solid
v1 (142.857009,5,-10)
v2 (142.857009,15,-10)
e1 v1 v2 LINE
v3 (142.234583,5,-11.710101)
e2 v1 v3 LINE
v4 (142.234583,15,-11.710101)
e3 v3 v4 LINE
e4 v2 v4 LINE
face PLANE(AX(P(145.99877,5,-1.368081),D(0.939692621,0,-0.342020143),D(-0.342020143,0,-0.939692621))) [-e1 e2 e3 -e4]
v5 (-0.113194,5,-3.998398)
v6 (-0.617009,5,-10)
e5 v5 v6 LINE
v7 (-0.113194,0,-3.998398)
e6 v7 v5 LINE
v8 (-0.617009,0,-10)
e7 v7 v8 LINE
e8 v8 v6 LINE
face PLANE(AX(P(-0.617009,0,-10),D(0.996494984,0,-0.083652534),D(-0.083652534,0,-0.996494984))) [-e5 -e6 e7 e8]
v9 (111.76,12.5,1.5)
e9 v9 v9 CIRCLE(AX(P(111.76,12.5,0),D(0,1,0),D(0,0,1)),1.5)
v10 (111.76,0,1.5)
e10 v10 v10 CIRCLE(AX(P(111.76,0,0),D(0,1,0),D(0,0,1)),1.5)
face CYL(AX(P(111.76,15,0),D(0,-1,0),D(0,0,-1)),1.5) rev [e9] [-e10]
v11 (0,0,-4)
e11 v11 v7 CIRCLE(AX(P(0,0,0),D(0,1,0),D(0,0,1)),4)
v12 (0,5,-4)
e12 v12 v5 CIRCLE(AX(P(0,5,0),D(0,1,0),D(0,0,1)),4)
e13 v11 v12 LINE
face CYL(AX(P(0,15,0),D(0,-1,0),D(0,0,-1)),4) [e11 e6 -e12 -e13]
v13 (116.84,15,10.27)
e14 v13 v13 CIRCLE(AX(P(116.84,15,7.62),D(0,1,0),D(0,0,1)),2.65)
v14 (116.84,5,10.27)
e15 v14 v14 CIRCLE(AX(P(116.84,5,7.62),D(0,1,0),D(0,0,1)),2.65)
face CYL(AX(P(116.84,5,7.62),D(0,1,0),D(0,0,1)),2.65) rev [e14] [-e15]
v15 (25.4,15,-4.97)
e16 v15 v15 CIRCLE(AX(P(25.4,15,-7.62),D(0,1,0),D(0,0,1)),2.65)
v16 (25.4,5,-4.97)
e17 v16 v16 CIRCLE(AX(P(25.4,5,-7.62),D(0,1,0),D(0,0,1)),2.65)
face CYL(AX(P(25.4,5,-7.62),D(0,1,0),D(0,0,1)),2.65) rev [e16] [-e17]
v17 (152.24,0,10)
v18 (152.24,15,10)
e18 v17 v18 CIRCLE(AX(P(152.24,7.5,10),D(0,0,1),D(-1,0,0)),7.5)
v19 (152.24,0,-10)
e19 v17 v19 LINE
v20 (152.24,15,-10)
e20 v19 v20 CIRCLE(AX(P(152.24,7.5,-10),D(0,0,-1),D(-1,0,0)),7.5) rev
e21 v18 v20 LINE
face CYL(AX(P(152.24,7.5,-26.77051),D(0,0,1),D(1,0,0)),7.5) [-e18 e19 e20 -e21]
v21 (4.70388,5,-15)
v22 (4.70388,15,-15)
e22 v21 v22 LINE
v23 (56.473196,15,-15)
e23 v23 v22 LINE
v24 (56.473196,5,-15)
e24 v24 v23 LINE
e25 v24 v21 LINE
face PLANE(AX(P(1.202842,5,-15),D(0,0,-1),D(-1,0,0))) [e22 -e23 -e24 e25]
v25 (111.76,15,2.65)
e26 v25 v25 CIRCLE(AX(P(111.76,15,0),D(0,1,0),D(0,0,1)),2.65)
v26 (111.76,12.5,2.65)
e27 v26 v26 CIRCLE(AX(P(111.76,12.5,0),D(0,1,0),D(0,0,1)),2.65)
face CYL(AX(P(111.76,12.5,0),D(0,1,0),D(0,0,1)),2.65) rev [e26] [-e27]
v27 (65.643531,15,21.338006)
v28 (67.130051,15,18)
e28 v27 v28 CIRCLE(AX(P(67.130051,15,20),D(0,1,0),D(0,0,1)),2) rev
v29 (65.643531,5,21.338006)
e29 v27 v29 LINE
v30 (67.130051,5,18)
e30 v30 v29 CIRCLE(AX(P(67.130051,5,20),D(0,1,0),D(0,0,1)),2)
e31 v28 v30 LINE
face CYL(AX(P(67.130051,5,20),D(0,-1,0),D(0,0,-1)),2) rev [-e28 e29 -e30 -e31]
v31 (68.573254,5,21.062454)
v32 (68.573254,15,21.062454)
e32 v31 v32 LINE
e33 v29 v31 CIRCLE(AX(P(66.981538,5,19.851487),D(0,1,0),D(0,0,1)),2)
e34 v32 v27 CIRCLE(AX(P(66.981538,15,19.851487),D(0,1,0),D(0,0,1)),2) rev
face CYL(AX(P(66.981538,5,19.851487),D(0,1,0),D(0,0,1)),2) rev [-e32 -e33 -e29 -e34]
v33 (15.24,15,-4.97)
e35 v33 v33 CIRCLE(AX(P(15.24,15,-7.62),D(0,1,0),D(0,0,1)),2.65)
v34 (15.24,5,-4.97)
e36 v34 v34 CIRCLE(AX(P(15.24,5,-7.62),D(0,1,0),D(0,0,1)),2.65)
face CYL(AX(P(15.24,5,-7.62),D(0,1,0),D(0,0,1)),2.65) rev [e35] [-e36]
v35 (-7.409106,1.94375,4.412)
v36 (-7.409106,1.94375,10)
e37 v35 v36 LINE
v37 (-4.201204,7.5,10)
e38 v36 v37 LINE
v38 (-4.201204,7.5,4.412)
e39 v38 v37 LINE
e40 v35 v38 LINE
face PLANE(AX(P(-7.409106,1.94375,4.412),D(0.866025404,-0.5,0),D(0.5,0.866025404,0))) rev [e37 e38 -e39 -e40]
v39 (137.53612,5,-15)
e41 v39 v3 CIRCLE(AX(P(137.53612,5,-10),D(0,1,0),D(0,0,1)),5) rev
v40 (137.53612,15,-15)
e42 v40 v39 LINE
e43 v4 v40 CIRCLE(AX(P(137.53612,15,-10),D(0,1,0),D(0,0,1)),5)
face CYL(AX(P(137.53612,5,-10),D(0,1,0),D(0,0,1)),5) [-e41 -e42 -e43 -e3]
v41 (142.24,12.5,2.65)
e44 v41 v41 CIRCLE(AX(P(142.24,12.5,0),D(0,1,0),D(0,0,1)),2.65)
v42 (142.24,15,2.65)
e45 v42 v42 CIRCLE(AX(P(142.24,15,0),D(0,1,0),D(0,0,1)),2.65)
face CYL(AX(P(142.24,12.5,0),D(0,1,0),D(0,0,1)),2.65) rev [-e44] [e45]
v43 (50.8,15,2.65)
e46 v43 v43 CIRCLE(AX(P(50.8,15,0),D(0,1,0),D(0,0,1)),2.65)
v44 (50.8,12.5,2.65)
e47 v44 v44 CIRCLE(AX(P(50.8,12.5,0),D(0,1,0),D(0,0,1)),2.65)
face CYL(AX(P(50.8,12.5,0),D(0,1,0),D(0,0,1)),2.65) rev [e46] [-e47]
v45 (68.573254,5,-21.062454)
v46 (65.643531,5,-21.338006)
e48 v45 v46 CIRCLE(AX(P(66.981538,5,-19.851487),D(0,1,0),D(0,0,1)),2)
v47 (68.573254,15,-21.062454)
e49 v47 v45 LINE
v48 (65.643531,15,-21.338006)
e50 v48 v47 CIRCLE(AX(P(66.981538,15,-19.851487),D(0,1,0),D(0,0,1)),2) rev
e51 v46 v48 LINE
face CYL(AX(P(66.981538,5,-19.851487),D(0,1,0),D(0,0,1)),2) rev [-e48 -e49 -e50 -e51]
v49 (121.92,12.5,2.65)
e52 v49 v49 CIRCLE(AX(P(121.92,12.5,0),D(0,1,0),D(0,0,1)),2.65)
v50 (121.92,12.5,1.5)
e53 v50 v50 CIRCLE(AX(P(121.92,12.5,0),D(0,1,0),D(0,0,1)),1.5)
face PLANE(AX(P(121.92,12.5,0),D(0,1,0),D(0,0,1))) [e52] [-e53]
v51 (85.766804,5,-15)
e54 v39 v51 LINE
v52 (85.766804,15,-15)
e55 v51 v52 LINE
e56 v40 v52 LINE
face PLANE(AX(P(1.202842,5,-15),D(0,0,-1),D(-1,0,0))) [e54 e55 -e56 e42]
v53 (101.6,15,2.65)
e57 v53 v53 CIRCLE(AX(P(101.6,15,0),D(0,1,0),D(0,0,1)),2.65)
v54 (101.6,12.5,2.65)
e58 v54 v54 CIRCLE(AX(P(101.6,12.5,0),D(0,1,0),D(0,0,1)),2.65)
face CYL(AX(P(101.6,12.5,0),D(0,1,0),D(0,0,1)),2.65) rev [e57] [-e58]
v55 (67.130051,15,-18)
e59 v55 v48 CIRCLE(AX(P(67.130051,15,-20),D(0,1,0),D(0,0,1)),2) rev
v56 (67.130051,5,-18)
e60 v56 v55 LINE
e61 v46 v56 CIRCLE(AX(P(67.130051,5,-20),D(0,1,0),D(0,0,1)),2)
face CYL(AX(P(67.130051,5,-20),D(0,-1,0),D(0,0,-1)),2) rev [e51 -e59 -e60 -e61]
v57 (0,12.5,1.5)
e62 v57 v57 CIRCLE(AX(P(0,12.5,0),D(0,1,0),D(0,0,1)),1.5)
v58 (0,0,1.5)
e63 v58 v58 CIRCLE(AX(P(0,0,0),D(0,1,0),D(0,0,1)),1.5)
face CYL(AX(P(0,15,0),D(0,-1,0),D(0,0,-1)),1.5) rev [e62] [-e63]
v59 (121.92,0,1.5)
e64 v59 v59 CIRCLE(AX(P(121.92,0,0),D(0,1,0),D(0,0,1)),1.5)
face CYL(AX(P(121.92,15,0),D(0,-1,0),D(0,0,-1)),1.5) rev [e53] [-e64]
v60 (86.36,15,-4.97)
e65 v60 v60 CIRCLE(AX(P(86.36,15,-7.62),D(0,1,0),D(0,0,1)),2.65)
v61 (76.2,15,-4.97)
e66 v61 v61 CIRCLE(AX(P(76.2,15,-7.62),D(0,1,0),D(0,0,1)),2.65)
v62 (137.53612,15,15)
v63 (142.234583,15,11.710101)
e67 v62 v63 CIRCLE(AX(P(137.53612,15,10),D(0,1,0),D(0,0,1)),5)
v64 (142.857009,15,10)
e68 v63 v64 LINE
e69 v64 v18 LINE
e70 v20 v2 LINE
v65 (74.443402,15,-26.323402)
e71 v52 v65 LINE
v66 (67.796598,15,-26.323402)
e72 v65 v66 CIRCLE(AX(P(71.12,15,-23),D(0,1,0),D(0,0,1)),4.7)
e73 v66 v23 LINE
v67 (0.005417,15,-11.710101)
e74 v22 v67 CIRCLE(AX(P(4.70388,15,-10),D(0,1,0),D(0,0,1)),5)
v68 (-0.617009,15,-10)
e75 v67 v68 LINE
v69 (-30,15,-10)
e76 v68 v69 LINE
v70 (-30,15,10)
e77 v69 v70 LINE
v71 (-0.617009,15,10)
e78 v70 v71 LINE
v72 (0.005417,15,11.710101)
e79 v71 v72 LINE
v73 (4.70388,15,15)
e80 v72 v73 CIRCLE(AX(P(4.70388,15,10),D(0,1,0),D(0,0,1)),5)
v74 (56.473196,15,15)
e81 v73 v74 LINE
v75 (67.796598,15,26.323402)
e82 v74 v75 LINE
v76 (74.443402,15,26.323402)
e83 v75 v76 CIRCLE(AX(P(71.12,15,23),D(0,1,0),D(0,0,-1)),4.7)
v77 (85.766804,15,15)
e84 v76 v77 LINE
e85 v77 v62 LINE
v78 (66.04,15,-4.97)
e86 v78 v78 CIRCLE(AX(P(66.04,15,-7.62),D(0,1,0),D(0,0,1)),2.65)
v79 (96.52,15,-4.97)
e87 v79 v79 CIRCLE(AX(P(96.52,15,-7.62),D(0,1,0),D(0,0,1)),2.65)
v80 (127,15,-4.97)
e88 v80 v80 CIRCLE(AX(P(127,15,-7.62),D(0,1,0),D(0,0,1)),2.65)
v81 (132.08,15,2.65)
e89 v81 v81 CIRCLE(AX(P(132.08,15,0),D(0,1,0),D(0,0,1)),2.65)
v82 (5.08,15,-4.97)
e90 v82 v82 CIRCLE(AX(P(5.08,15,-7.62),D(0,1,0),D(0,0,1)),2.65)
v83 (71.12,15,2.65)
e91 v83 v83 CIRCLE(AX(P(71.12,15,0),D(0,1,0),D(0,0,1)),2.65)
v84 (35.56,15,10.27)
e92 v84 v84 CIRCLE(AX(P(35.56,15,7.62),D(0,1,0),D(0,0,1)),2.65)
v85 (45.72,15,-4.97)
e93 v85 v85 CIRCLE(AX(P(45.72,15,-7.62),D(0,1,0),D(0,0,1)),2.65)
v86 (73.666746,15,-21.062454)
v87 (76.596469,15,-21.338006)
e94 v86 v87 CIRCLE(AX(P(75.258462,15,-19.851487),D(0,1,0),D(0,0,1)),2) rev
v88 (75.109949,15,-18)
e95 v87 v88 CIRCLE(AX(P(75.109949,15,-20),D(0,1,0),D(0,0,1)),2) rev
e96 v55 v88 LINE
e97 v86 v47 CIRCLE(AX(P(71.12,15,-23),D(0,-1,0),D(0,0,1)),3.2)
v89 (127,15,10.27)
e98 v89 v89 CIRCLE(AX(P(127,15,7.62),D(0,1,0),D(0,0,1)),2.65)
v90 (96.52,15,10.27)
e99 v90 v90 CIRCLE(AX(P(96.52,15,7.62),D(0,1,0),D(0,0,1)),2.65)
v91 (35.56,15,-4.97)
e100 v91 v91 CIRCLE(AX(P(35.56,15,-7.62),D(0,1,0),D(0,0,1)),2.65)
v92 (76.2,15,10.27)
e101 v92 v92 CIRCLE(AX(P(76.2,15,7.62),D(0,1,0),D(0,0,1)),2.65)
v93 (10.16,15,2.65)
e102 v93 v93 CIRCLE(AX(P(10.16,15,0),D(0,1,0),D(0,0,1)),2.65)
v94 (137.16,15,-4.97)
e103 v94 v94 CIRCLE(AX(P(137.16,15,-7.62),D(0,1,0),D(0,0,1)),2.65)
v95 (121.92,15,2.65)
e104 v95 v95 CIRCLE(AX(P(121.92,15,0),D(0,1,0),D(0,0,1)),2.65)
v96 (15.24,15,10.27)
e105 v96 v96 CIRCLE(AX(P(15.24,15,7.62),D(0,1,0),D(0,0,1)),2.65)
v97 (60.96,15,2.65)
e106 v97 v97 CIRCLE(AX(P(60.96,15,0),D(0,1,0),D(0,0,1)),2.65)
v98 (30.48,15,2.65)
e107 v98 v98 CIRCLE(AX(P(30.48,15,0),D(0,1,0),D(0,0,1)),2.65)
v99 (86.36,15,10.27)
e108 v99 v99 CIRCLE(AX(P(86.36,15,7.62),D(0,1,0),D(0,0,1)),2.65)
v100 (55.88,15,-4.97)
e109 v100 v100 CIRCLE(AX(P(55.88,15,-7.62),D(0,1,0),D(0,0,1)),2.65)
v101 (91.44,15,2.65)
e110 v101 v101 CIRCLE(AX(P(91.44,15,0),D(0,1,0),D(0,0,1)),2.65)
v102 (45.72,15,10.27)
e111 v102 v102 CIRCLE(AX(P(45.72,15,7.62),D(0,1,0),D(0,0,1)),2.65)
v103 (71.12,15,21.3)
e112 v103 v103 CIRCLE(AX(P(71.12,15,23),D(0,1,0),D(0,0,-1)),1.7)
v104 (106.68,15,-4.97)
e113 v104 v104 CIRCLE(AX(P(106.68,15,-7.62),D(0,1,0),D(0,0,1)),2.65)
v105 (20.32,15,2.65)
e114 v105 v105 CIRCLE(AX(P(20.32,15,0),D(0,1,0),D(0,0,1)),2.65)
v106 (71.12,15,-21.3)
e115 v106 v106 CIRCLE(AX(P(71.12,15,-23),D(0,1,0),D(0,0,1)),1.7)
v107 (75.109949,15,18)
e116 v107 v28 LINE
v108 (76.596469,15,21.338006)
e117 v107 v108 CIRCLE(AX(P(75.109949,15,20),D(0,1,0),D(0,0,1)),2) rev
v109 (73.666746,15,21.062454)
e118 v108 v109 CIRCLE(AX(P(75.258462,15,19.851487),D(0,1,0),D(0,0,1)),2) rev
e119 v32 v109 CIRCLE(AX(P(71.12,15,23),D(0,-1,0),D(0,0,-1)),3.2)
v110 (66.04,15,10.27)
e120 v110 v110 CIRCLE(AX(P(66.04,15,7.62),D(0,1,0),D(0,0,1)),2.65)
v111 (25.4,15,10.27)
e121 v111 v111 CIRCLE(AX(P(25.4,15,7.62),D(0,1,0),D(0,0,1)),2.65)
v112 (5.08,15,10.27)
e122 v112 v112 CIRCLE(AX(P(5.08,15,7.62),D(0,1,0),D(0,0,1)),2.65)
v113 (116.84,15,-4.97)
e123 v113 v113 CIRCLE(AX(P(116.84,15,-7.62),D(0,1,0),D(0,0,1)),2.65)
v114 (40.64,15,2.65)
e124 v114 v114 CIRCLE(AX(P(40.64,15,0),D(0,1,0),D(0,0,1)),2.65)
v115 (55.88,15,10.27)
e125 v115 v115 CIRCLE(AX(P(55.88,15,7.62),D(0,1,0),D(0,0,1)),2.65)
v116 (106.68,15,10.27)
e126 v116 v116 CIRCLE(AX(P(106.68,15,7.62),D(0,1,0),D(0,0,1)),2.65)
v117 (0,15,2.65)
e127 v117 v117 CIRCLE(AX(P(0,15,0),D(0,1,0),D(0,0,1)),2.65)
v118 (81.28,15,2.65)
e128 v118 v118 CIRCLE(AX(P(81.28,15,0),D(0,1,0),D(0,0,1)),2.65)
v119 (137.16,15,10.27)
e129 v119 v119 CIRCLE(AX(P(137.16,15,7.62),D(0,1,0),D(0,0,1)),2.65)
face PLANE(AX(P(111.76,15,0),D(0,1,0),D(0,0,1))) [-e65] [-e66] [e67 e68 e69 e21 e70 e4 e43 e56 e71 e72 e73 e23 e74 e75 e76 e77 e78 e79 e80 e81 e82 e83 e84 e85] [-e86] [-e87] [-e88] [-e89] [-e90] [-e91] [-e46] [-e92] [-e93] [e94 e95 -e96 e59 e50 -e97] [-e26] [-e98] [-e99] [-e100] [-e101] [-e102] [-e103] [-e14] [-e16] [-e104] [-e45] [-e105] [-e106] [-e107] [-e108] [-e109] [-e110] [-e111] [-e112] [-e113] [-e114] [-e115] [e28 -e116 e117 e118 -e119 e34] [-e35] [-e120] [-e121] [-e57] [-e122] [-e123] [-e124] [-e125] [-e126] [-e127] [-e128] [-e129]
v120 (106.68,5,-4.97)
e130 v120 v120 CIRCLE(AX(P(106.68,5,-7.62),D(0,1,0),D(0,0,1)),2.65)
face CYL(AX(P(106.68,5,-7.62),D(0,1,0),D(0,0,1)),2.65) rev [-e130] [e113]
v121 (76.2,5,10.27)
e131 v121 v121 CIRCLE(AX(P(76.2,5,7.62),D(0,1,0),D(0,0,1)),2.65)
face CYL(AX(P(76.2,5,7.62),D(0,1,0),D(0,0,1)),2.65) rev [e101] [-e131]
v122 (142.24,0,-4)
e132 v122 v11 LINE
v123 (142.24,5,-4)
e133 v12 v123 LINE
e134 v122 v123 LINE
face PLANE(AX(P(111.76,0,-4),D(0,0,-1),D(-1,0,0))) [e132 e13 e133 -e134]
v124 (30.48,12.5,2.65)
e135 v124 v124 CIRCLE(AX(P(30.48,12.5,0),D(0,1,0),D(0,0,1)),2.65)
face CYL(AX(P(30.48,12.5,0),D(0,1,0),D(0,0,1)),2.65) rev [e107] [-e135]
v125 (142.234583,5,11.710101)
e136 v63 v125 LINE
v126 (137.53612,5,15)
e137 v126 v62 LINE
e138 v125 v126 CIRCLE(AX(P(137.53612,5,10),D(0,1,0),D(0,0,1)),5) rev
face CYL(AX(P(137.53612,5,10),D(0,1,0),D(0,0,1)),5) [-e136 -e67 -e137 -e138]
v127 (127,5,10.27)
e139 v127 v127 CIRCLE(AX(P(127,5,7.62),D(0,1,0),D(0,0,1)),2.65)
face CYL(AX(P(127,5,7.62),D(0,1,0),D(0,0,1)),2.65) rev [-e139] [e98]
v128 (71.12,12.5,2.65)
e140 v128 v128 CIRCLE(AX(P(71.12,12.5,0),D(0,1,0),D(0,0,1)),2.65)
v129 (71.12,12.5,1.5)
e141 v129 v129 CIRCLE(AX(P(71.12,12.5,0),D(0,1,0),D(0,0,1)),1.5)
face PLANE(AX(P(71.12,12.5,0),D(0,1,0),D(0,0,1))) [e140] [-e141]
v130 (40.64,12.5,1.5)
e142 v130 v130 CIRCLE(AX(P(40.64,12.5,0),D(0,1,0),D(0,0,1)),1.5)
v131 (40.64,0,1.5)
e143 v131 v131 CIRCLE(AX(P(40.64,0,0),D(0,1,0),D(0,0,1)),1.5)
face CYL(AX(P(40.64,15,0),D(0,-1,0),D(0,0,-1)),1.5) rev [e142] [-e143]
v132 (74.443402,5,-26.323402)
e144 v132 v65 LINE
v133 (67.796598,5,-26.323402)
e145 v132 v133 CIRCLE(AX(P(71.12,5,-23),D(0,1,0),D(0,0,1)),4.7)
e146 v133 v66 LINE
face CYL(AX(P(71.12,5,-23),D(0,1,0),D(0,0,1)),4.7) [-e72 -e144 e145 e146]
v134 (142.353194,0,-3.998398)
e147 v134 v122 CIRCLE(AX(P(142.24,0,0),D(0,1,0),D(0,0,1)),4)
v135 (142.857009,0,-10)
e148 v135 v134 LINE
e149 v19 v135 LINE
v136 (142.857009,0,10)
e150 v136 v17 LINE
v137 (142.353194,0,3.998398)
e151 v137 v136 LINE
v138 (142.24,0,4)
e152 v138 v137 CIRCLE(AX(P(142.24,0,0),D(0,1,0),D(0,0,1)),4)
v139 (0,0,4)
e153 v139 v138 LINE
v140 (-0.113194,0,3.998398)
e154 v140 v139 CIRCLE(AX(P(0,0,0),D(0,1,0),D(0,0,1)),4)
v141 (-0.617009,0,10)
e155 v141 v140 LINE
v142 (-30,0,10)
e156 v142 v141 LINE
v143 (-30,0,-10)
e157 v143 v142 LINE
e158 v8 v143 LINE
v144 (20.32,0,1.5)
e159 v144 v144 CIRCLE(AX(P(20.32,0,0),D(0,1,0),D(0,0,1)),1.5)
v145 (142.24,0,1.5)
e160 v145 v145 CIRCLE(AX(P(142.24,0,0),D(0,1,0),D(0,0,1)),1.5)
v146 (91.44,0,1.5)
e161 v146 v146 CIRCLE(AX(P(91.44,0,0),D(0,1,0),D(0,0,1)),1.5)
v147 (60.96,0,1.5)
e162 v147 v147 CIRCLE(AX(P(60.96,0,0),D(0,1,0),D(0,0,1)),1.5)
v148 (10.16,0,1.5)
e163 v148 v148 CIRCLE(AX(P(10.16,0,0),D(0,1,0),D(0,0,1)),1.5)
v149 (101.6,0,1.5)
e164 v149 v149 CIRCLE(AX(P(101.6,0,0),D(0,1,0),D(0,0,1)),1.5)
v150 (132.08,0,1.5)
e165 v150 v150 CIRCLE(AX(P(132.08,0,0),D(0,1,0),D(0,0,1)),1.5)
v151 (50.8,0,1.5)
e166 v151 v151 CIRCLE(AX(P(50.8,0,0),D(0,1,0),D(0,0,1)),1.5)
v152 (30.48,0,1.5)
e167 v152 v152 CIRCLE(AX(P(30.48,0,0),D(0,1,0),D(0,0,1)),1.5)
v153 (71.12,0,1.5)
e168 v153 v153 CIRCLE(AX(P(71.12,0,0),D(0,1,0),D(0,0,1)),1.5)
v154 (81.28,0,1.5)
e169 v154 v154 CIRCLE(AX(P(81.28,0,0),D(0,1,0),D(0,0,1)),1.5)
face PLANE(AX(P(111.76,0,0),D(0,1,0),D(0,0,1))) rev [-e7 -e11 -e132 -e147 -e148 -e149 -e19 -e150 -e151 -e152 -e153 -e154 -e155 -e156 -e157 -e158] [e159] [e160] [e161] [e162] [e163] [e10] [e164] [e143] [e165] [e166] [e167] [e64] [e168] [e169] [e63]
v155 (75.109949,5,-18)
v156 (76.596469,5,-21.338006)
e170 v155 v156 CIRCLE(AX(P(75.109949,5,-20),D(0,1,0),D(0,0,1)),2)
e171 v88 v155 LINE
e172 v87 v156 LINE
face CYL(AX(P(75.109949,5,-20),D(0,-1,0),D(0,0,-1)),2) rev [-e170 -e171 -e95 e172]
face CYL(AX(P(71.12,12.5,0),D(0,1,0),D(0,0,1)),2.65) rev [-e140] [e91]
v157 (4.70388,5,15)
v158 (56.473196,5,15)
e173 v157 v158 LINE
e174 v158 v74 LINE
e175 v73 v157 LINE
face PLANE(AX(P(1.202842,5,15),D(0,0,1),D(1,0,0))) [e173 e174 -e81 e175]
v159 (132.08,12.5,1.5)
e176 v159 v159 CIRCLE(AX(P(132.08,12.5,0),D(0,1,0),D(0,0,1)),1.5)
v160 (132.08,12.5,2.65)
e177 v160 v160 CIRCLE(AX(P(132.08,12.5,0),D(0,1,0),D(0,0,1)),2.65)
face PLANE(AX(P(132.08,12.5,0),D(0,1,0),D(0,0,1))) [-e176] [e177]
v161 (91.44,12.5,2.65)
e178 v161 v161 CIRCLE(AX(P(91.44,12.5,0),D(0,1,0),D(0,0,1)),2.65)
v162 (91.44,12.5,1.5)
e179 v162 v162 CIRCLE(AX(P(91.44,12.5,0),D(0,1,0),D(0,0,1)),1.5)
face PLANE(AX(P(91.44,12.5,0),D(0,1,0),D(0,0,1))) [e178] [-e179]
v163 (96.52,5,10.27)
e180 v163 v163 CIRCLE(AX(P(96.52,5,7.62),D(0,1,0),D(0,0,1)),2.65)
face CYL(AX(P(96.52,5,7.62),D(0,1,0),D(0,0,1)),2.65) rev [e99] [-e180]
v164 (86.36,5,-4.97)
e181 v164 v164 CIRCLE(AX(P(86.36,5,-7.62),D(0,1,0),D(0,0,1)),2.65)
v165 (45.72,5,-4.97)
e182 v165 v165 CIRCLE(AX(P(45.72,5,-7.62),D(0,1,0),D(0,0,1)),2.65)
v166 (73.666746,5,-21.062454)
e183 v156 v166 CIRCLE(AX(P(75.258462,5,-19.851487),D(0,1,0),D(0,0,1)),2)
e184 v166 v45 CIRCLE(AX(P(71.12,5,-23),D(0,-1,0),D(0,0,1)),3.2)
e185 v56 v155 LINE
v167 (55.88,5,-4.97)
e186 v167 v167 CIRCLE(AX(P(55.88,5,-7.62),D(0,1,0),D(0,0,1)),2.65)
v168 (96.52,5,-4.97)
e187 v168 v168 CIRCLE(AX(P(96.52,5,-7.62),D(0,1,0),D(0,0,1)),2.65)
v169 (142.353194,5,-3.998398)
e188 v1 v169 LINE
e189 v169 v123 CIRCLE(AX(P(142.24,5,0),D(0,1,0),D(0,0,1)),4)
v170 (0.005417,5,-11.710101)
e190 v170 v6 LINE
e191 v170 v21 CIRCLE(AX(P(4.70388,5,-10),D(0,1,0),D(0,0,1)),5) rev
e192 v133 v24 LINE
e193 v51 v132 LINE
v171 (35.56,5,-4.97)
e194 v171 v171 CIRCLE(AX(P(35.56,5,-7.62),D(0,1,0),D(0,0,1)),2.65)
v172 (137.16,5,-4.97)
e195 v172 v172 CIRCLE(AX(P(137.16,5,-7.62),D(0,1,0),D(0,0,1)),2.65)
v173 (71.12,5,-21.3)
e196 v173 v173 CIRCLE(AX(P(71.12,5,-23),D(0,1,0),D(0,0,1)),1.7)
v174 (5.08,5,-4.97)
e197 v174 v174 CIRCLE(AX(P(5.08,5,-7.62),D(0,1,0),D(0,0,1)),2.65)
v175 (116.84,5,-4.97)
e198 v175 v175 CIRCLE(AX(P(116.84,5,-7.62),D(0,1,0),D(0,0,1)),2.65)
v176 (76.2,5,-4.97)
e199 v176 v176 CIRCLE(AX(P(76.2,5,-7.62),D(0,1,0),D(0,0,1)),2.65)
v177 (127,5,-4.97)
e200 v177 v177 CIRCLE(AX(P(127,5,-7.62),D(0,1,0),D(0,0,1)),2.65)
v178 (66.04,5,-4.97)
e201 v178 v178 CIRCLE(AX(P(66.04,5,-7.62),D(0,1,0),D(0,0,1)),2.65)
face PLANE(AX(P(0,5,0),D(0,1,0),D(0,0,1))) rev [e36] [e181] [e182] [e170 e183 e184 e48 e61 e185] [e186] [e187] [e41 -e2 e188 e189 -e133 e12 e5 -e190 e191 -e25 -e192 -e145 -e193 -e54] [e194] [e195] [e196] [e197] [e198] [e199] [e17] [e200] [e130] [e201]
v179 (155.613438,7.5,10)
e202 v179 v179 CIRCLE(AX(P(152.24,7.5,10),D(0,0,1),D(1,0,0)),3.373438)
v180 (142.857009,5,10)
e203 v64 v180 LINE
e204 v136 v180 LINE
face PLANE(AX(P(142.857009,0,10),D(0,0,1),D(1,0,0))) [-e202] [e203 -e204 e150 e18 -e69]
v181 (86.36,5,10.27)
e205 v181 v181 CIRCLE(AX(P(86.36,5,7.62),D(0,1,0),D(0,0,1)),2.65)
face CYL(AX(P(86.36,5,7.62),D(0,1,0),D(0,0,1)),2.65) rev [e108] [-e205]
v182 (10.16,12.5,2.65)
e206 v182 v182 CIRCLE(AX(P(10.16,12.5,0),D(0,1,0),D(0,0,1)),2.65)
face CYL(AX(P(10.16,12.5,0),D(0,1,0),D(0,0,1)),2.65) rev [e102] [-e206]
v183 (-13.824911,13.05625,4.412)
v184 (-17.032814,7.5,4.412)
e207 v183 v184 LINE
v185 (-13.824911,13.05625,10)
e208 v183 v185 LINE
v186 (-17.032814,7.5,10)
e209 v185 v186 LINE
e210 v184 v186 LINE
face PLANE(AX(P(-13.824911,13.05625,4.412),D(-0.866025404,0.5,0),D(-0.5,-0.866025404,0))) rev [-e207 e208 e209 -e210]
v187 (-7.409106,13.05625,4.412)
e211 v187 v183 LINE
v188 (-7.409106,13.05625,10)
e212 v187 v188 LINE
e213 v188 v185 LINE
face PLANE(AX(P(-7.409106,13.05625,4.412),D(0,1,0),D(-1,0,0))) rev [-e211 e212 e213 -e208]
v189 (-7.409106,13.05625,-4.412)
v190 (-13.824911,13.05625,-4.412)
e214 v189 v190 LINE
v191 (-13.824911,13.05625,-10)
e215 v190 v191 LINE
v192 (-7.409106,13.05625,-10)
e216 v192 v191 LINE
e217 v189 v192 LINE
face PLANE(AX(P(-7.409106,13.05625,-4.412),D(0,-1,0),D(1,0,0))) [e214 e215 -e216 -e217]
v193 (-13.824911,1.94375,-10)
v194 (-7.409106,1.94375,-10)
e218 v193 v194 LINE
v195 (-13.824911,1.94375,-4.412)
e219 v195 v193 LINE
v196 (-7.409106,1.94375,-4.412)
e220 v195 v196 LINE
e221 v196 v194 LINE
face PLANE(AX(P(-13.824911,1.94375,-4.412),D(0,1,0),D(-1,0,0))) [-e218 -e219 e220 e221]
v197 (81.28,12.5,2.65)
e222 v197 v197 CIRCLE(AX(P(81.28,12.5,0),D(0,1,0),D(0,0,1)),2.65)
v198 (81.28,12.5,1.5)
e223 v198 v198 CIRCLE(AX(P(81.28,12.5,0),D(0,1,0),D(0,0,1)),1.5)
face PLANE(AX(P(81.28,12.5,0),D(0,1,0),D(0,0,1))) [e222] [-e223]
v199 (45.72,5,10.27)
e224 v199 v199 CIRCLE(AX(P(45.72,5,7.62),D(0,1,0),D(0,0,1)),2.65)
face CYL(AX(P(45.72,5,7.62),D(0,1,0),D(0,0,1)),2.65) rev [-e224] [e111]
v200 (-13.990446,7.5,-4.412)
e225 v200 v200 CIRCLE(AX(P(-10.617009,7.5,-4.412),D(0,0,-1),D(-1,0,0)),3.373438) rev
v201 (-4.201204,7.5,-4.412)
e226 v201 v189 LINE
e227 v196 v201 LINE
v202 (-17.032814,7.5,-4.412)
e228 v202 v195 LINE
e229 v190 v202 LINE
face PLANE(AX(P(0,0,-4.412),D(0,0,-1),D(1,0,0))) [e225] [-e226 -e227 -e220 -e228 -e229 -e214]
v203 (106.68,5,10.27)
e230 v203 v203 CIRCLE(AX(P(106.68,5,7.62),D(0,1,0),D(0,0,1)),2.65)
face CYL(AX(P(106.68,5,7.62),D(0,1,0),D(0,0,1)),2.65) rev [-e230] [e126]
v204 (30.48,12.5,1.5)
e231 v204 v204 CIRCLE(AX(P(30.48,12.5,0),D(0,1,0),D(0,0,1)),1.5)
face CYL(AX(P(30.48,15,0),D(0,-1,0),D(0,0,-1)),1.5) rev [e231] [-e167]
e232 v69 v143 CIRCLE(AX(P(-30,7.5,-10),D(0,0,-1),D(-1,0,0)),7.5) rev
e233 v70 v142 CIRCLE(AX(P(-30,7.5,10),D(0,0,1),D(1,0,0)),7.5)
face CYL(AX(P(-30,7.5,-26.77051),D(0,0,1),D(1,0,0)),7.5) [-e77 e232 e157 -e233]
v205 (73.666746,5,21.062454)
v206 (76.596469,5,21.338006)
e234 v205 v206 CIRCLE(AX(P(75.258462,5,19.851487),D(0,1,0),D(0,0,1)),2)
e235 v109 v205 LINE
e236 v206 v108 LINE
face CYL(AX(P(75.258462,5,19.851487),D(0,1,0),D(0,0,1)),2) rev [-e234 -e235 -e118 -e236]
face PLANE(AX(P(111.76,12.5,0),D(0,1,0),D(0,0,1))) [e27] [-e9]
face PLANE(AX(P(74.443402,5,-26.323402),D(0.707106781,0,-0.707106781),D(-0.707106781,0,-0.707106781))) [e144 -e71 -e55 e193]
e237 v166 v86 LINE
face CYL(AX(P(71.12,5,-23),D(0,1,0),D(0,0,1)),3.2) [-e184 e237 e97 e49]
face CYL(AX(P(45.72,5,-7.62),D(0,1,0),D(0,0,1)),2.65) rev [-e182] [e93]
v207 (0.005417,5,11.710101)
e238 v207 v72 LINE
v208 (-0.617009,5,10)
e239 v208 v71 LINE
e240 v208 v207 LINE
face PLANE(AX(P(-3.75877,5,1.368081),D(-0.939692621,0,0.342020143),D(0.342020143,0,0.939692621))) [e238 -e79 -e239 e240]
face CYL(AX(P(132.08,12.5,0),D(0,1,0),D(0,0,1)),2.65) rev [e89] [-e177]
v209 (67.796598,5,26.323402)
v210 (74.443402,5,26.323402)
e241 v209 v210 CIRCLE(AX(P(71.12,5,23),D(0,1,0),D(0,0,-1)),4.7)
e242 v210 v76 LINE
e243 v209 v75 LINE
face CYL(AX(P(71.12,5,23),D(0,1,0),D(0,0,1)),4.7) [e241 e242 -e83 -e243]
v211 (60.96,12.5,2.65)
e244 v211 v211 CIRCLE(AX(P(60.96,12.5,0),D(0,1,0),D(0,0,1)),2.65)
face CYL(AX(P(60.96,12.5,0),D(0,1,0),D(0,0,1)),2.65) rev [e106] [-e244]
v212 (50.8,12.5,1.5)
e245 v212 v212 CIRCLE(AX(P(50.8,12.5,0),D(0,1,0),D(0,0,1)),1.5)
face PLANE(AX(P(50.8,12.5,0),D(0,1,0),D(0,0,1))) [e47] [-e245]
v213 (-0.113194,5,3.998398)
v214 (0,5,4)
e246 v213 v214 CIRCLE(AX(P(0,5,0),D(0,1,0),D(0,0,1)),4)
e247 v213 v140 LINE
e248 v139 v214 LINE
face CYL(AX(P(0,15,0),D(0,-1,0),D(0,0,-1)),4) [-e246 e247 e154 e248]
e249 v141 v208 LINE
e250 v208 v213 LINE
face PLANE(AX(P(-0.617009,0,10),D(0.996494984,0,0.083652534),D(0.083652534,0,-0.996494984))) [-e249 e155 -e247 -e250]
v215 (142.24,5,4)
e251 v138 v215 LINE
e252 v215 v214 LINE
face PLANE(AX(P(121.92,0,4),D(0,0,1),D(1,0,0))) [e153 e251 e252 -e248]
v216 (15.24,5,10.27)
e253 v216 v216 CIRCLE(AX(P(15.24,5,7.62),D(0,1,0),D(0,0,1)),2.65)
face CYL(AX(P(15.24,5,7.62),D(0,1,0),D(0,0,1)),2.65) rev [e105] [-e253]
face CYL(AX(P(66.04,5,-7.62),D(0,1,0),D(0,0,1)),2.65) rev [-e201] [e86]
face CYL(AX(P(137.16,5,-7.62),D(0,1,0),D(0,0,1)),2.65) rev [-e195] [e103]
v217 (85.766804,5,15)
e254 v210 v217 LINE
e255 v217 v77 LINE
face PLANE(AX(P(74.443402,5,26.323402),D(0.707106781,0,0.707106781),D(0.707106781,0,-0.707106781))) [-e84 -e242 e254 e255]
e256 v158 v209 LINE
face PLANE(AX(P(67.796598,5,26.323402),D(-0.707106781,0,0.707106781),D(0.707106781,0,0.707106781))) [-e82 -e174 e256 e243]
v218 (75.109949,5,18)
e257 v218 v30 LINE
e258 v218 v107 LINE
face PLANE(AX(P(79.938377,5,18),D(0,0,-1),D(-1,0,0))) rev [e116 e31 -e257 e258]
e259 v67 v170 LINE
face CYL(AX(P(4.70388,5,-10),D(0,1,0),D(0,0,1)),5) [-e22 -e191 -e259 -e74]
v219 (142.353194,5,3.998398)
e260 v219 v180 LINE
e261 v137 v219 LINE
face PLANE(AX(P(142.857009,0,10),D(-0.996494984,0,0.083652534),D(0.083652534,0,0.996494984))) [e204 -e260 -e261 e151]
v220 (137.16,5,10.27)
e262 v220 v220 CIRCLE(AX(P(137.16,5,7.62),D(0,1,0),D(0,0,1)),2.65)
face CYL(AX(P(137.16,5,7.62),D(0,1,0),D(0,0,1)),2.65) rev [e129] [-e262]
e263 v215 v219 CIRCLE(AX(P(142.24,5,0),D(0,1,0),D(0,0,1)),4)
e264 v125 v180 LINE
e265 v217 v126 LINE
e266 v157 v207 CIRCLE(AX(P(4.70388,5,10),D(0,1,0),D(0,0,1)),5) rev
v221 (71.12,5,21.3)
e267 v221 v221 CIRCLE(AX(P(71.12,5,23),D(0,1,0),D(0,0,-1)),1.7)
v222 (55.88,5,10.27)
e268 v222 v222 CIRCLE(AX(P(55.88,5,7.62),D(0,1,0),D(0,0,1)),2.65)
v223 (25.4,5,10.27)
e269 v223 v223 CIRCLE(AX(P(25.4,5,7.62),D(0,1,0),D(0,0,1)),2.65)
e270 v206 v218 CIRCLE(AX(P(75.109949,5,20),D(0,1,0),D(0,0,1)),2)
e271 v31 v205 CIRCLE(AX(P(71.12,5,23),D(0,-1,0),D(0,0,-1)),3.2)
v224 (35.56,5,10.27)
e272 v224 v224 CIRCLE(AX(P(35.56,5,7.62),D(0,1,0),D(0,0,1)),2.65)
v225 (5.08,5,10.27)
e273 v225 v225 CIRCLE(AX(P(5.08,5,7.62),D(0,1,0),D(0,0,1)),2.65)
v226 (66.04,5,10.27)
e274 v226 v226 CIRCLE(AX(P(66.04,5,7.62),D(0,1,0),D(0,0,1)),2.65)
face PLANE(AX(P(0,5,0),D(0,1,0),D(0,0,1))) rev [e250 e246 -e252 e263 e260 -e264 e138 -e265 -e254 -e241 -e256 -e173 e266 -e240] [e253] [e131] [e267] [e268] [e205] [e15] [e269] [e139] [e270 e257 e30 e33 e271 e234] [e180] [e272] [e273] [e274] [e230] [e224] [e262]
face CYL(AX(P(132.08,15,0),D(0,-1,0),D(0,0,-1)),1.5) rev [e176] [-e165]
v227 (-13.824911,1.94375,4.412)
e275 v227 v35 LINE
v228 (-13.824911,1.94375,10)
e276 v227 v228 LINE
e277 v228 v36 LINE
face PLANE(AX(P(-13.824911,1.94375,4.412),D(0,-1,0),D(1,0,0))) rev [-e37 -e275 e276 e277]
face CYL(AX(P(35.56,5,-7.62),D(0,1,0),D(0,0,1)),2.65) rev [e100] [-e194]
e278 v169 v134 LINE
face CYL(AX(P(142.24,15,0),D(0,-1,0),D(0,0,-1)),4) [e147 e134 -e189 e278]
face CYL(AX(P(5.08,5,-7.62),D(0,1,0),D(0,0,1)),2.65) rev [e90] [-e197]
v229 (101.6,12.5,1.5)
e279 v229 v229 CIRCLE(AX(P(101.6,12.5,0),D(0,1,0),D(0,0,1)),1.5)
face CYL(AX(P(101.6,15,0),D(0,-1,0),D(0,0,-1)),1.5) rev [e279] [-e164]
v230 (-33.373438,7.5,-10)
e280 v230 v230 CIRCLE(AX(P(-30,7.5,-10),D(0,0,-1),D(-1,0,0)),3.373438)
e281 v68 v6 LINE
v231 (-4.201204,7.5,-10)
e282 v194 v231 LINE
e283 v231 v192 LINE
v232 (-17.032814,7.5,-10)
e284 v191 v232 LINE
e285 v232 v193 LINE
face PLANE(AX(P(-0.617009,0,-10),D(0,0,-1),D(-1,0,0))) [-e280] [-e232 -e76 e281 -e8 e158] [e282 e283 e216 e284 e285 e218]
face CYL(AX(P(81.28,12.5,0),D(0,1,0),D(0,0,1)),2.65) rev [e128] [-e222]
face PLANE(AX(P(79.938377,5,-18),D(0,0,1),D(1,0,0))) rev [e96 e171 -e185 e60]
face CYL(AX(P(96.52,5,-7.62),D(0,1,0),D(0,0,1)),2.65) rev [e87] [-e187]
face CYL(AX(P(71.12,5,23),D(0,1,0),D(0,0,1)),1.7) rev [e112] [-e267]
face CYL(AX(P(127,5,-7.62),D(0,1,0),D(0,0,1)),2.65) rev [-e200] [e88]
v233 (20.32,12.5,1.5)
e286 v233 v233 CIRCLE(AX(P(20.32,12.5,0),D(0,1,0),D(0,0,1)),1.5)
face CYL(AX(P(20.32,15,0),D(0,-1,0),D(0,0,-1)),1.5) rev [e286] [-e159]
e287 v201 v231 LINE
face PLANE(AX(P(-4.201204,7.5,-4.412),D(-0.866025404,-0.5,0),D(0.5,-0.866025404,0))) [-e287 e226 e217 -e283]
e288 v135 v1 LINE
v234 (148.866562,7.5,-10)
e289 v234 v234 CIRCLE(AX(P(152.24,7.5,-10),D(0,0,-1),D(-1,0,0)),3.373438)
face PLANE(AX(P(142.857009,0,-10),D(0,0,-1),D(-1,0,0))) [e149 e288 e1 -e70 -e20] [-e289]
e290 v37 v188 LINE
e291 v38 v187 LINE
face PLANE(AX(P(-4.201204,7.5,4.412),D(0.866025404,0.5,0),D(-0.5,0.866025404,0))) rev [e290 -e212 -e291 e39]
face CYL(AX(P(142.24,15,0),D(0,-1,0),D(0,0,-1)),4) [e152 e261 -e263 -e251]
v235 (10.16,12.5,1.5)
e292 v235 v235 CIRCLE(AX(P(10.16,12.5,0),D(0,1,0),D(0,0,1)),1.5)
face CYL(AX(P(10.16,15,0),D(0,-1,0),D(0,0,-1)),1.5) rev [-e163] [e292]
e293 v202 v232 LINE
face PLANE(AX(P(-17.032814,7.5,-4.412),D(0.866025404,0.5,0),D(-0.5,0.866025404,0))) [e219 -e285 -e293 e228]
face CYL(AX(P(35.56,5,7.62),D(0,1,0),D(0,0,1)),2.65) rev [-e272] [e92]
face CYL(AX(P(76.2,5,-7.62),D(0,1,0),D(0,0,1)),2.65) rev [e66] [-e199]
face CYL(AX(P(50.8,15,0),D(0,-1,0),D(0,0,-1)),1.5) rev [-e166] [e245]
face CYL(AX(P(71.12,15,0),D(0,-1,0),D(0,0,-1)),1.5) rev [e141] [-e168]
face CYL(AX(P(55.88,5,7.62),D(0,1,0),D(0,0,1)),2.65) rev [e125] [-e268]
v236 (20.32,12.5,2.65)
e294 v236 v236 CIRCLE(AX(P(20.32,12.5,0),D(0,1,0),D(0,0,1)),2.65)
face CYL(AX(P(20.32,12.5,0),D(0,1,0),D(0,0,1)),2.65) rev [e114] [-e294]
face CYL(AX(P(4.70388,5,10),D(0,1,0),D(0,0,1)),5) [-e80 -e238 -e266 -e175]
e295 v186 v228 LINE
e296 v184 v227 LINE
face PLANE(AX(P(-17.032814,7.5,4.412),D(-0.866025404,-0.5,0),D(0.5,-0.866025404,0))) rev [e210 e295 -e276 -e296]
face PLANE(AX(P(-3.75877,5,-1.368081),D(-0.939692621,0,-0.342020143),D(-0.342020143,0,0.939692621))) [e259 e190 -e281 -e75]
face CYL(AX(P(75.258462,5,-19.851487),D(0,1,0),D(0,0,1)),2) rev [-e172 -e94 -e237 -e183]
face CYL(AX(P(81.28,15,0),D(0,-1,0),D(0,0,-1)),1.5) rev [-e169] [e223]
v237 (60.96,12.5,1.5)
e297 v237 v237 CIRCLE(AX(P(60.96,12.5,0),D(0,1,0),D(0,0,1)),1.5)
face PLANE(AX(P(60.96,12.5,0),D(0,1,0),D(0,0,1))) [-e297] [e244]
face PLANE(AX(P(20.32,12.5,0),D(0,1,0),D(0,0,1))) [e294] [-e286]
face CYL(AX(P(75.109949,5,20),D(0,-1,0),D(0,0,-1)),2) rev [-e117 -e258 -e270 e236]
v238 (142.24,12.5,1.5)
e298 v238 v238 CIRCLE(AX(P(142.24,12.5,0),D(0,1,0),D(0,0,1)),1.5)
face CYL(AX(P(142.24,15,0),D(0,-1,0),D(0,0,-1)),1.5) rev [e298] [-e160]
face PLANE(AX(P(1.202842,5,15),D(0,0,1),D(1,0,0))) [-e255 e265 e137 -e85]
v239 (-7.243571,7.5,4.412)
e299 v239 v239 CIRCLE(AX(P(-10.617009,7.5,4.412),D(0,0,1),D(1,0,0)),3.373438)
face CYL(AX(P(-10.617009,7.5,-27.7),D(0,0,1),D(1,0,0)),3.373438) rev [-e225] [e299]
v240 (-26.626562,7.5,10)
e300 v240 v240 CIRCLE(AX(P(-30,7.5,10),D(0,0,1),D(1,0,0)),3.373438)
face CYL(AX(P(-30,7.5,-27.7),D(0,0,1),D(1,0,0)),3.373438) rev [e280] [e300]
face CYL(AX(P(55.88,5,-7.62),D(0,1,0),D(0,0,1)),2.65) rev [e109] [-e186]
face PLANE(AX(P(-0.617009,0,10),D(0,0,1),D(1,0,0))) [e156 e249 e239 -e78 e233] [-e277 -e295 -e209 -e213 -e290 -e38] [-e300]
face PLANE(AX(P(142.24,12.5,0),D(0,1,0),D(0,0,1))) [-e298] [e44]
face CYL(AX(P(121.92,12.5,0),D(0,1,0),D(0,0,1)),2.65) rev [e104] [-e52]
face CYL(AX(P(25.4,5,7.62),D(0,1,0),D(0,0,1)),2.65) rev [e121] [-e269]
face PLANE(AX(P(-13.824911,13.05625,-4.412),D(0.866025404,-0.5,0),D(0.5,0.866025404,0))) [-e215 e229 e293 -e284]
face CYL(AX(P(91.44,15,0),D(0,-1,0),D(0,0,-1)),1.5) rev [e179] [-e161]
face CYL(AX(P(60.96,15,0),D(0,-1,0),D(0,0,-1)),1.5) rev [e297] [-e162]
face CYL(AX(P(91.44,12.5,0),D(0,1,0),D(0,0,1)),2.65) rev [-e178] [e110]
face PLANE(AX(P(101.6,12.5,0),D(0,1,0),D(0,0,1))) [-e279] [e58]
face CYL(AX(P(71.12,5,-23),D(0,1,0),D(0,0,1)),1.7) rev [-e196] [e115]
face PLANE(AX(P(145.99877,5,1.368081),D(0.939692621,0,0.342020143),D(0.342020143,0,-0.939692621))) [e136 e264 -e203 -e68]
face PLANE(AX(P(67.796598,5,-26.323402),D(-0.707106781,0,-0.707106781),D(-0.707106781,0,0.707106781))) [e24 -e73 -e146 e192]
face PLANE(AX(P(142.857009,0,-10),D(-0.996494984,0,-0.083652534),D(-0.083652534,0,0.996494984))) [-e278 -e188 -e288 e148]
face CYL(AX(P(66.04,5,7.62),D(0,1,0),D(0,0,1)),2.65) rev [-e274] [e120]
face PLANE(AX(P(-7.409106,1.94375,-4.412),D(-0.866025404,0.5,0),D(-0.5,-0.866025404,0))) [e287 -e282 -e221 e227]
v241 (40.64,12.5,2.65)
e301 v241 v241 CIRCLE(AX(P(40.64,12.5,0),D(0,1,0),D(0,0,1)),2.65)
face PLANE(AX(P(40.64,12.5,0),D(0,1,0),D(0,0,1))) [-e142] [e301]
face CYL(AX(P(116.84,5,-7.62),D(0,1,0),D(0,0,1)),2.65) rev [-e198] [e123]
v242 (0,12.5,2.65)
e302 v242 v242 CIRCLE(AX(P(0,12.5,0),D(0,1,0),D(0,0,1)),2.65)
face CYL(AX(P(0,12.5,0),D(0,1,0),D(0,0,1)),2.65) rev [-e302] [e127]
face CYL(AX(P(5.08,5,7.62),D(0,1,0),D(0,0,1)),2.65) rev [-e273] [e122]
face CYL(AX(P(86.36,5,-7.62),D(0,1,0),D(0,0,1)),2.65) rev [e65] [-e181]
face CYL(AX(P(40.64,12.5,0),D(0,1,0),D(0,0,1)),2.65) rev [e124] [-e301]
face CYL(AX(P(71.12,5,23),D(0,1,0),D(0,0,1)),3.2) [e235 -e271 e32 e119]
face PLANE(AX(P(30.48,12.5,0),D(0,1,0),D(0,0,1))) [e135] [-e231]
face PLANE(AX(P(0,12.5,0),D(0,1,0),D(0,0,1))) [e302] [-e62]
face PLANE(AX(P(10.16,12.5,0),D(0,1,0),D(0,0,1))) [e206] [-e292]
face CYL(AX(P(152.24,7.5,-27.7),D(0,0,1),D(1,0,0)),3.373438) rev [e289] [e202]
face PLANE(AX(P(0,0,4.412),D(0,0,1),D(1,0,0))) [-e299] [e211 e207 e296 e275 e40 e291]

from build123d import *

# Parameters (mm, degrees)
SKETCH1_R           = 4
SKETCH1_R_2         = 1.5
BOSS_EXTRUDE1_DEPTH = 15
SKETCH3_R           = 2.65
CUT_EXTRUDE1_DEPTH  = 2.5
BOSS_EXTRUDE2_START = -15
BOSS_EXTRUDE2_DEPTH = 15
LPATTERN2_COUNT     = 14
LPATTERN2_PITCH     = 10.16
LPATTERN3_COUNT     = 2
LPATTERN3_PITCH     = 142.24
SKETCH4_R           = 2.65
BOSS_EXTRUDE4_DEPTH = 10
FILLET1_R           = 5
SKETCH5_R           = 1.7
BOSS_EXTRUDE5_DEPTH = 10
FILLET2_R           = 2
BOSS_EXTRUDE6_DEPTH = 15
BOSS_EXTRUDE7_DEPTH = 20
CUT_EXTRUDE2_DEPTH  = 5.588
SKETCH8_R           = 3.3734375
CUT_EXTRUDE3_DEPTH  = 152.764381856
BOSS_EXTRUDE8_DEPTH = 15
BOSS_EXTRUDE9_DEPTH = 20
SKETCH13_R          = 3.3734375
CUT_EXTRUDE4_DEPTH  = 165.812492245


with BuildPart() as part:
    # Sketch1 → Boss-Extrude1 (new body)
    with BuildSketch(Plane(origin=(0, 0, 0), x_dir=(1, 0, 0), z_dir=(0, 1, 0))):
        with Locations(Location((0, 0, 0), (0, 0, 270))):
            Circle(SKETCH1_R)
        with Locations(Location((0, 0, 0), (0, 0, 270))):
            Circle(SKETCH1_R_2, mode=Mode.SUBTRACT)
    boss_extrude1 = extrude(amount=BOSS_EXTRUDE1_DEPTH)

    # Sketch3 → Cut-Extrude1 (cut)
    with BuildSketch(Plane(origin=(0, 15, 0), x_dir=(1, 0, 0), z_dir=(0, 1, 0))):
        with Locations(Location((0, 0, 0), (0, 0, 270))):
            Circle(SKETCH3_R)
    cut_extrude1 = extrude(amount=-CUT_EXTRUDE1_DEPTH, mode=Mode.SUBTRACT)

    # Sketch2 → Boss-Extrude2 (add)
    with BuildSketch(Plane(origin=(0, 15, 0), x_dir=(1, 0, 0), z_dir=(0, 1, 0)).offset(BOSS_EXTRUDE2_START)):
        with BuildLine():
            Line((0, 4), (10.16, 4))
            ThreePointArc((10.16, 4), (6.16, 0), (10.16, -4))
            Line((10.16, -4), (0, -4))
            ThreePointArc((0, -4), (4, 0), (0, 4))
        make_face()
    extrude(amount=BOSS_EXTRUDE2_DEPTH)


with BuildPart() as lpattern2_1:
    # LPattern2: pattern copy
    add(part.part.moved(Location(Vector(1, 0, 0) * (1 * LPATTERN2_PITCH))))


with BuildPart() as lpattern2_2:
    # LPattern2: pattern copy
    add(part.part.moved(Location(Vector(1, 0, 0) * (2 * LPATTERN2_PITCH))))


with BuildPart() as lpattern2_3:
    # LPattern2: pattern copy
    add(part.part.moved(Location(Vector(1, 0, 0) * (3 * LPATTERN2_PITCH))))


with BuildPart() as lpattern2_4:
    # LPattern2: pattern copy
    add(part.part.moved(Location(Vector(1, 0, 0) * (4 * LPATTERN2_PITCH))))


with BuildPart() as lpattern2_5:
    # LPattern2: pattern copy
    add(part.part.moved(Location(Vector(1, 0, 0) * (5 * LPATTERN2_PITCH))))


with BuildPart() as lpattern2_6:
    # LPattern2: pattern copy
    add(part.part.moved(Location(Vector(1, 0, 0) * (6 * LPATTERN2_PITCH))))


with BuildPart() as lpattern2_7:
    # LPattern2: pattern copy
    add(part.part.moved(Location(Vector(1, 0, 0) * (7 * LPATTERN2_PITCH))))


with BuildPart() as lpattern2_8:
    # LPattern2: pattern copy
    add(part.part.moved(Location(Vector(1, 0, 0) * (8 * LPATTERN2_PITCH))))


with BuildPart() as lpattern2_9:
    # LPattern2: pattern copy
    add(part.part.moved(Location(Vector(1, 0, 0) * (9 * LPATTERN2_PITCH))))


with BuildPart() as lpattern2_10:
    # LPattern2: pattern copy
    add(part.part.moved(Location(Vector(1, 0, 0) * (10 * LPATTERN2_PITCH))))


with BuildPart() as lpattern2_11:
    # LPattern2: pattern copy
    add(part.part.moved(Location(Vector(1, 0, 0) * (11 * LPATTERN2_PITCH))))


with BuildPart() as lpattern2_12:
    # LPattern2: pattern copy
    add(part.part.moved(Location(Vector(1, 0, 0) * (12 * LPATTERN2_PITCH))))


with BuildPart() as lpattern2_13:
    # LPattern2: pattern copy
    add(part.part.moved(Location(Vector(1, 0, 0) * (13 * LPATTERN2_PITCH))))

    # LPattern3: Boss-Extrude1, Cut-Extrude1 ×2
    with Locations(*[(i * LPATTERN3_PITCH, 0, 0) for i in range(1, LPATTERN3_COUNT)]):
        add(boss_extrude1)
        add(cut_extrude1, mode=Mode.SUBTRACT)


with BuildPart() as lpattern2_11_1:
    add(lpattern2_11.part)

    # Combine1: union LPattern2_6, LPattern2_1, LPattern2_13, LPattern2_8, LPattern2_3, LPattern2_10, LPattern2_5, LPattern2_12, LPattern2_7, LPattern2_2, LPattern2_4, LPattern2_9, part
    add(lpattern2_6.part)
    add(lpattern2_1.part)
    add(lpattern2_13.part)
    add(lpattern2_8.part)
    add(lpattern2_3.part)
    add(lpattern2_10.part)
    add(lpattern2_5.part)
    add(lpattern2_12.part)
    add(lpattern2_7.part)
    add(lpattern2_2.part)
    add(lpattern2_4.part)
    add(lpattern2_9.part)
    add(part.part)

    # Sketch4 → Boss-Extrude4 (add)
    with BuildSketch(Plane(origin=(0, 15, 0), x_dir=(1, 0, 0), z_dir=(0, 1, 0))):
        with BuildLine():
            Line((-3.758770483, 1.368080573), (1.202842424, 15))
            Line((1.202842424, 15), (141.037157576, 15))
            Line((141.037157576, 15), (145.998770483, 1.368080573))
            ThreePointArc((145.998770483, 1.368080573), (146.24, 0), (145.998770483, -1.368080573))
            Line((145.998770483, -1.368080573), (141.037157576, -15))
            Line((141.037157576, -15), (1.202842424, -15))
            Line((1.202842424, -15), (-3.758770483, -1.368080573))
            ThreePointArc((-3.758770483, -1.368080573), (-4, 0), (-3.758770483, 1.368080573))
        make_face()
        with Locations(Location((5.08, 7.62, 0), (0, 0, 270))):
            Circle(SKETCH4_R, mode=Mode.SUBTRACT)
        with Locations(Location((15.24, 7.62, 0), (0, 0, 270))):
            Circle(SKETCH4_R, mode=Mode.SUBTRACT)
        with Locations(Location((25.4, 7.62, 0), (0, 0, 270))):
            Circle(SKETCH4_R, mode=Mode.SUBTRACT)
        with Locations(Location((35.56, 7.62, 0), (0, 0, 270))):
            Circle(SKETCH4_R, mode=Mode.SUBTRACT)
        with Locations(Location((45.72, 7.62, 0), (0, 0, 270))):
            Circle(SKETCH4_R, mode=Mode.SUBTRACT)
        with Locations(Location((55.88, 7.62, 0), (0, 0, 270))):
            Circle(SKETCH4_R, mode=Mode.SUBTRACT)
        with Locations(Location((66.04, 7.62, 0), (0, 0, 270))):
            Circle(SKETCH4_R, mode=Mode.SUBTRACT)
        with Locations(Location((76.2, 7.62, 0), (0, 0, 270))):
            Circle(SKETCH4_R, mode=Mode.SUBTRACT)
        with Locations(Location((86.36, 7.62, 0), (0, 0, 270))):
            Circle(SKETCH4_R, mode=Mode.SUBTRACT)
        with Locations(Location((96.52, 7.62, 0), (0, 0, 270))):
            Circle(SKETCH4_R, mode=Mode.SUBTRACT)
        with Locations(Location((106.68, 7.62, 0), (0, 0, 270))):
            Circle(SKETCH4_R, mode=Mode.SUBTRACT)
        with Locations(Location((116.84, 7.62, 0), (0, 0, 270))):
            Circle(SKETCH4_R, mode=Mode.SUBTRACT)
        with Locations(Location((127, 7.62, 0), (0, 0, 270))):
            Circle(SKETCH4_R, mode=Mode.SUBTRACT)
        with Locations(Location((137.16, 7.62, 0), (0, 0, 270))):
            Circle(SKETCH4_R, mode=Mode.SUBTRACT)
        with Locations(Location((15.24, -7.62, 0), (0, 0, 270))):
            Circle(SKETCH4_R, mode=Mode.SUBTRACT)
        with Locations(Location((25.4, -7.62, 0), (0, 0, 270))):
            Circle(SKETCH4_R, mode=Mode.SUBTRACT)
        with Locations(Location((35.56, -7.62, 0), (0, 0, 270))):
            Circle(SKETCH4_R, mode=Mode.SUBTRACT)
        with Locations(Location((45.72, -7.62, 0), (0, 0, 270))):
            Circle(SKETCH4_R, mode=Mode.SUBTRACT)
        with Locations(Location((55.88, -7.62, 0), (0, 0, 270))):
            Circle(SKETCH4_R, mode=Mode.SUBTRACT)
        with Locations(Location((66.04, -7.62, 0), (0, 0, 270))):
            Circle(SKETCH4_R, mode=Mode.SUBTRACT)
        with Locations(Location((76.2, -7.62, 0), (0, 0, 270))):
            Circle(SKETCH4_R, mode=Mode.SUBTRACT)
        with Locations(Location((86.36, -7.62, 0), (0, 0, 270))):
            Circle(SKETCH4_R, mode=Mode.SUBTRACT)
        with Locations(Location((96.52, -7.62, 0), (0, 0, 270))):
            Circle(SKETCH4_R, mode=Mode.SUBTRACT)
        with Locations(Location((106.68, -7.62, 0), (0, 0, 270))):
            Circle(SKETCH4_R, mode=Mode.SUBTRACT)
        with Locations(Location((116.84, -7.62, 0), (0, 0, 270))):
            Circle(SKETCH4_R, mode=Mode.SUBTRACT)
        with Locations(Location((127, -7.62, 0), (0, 0, 270))):
            Circle(SKETCH4_R, mode=Mode.SUBTRACT)
        with Locations(Location((137.16, -7.62, 0), (0, 0, 270))):
            Circle(SKETCH4_R, mode=Mode.SUBTRACT)
        with Locations(Location((5.08, -7.62, 0), (0, 0, 270))):
            Circle(SKETCH4_R, mode=Mode.SUBTRACT)
        with Locations(Location((0, 0, 0), (0, 0, 270))):
            Circle(SKETCH4_R, mode=Mode.SUBTRACT)
        with Locations(Location((10.16, 0, 0), (0, 0, 270))):
            Circle(SKETCH4_R, mode=Mode.SUBTRACT)
        with Locations(Location((20.32, 0, 0), (0, 0, 270))):
            Circle(SKETCH4_R, mode=Mode.SUBTRACT)
        with Locations(Location((30.48, 0, 0), (0, 0, 270))):
            Circle(SKETCH4_R, mode=Mode.SUBTRACT)
        with Locations(Location((40.64, 0, 0), (0, 0, 270))):
            Circle(SKETCH4_R, mode=Mode.SUBTRACT)
        with Locations(Location((50.8, 0, 0), (0, 0, 270))):
            Circle(SKETCH4_R, mode=Mode.SUBTRACT)
        with Locations(Location((60.96, 0, 0), (0, 0, 270))):
            Circle(SKETCH4_R, mode=Mode.SUBTRACT)
        with Locations(Location((71.12, 0, 0), (0, 0, 270))):
            Circle(SKETCH4_R, mode=Mode.SUBTRACT)
        with Locations(Location((81.28, 0, 0), (0, 0, 270))):
            Circle(SKETCH4_R, mode=Mode.SUBTRACT)
        with Locations(Location((91.44, 0, 0), (0, 0, 270))):
            Circle(SKETCH4_R, mode=Mode.SUBTRACT)
        with Locations(Location((101.6, 0, 0), (0, 0, 270))):
            Circle(SKETCH4_R, mode=Mode.SUBTRACT)
        with Locations(Location((111.76, 0, 0), (0, 0, 270))):
            Circle(SKETCH4_R, mode=Mode.SUBTRACT)
        with Locations(Location((121.92, 0, 0), (0, 0, 270))):
            Circle(SKETCH4_R, mode=Mode.SUBTRACT)
        with Locations(Location((132.08, 0, 0), (0, 0, 270))):
            Circle(SKETCH4_R, mode=Mode.SUBTRACT)
        with Locations(Location((142.24, 0, 0), (0, 0, 270))):
            Circle(SKETCH4_R, mode=Mode.SUBTRACT)
    extrude(amount=-BOSS_EXTRUDE4_DEPTH)

    # Fillet1
    fillet1_edges = [lpattern2_11_1.edges().sort_by_distance(p)[0] for p in [
        (1.202842424, 10, -15),
        (141.037157576, 10, -15),
        (141.037157576, 10, 15),
        (1.202842424, 10, 15),
    ]]
    fillet(fillet1_edges, radius=FILLET1_R)

    # Sketch5 → Boss-Extrude5 (add)
    # profile 1 of 2: a face of its own
    with BuildSketch(Plane(origin=(0, 15, 0), x_dir=(1, 0, 0), z_dir=(0, 1, 0))):
        with BuildLine():
            Line((67.796598128, 26.323401872), (56.473196257, 15))
            Line((56.473196257, 15), (85.766803743, 15))
            Line((85.766803743, 15), (74.443401872, 26.323401872))
            ThreePointArc((74.443401872, 26.323401872), (71.12, 27.7), (67.796598128, 26.323401872))
        make_face()
        with Locations(Location((71.12, 23, 0), (0, 0, 270))):
            Circle(SKETCH5_R, mode=Mode.SUBTRACT)
        with BuildLine():
            Line((62.301623382, 18), (67.996315911, 23.694692529))
            ThreePointArc((67.996315911, 23.694692529), (71.12, 19.8), (74.243684089, 23.694692529))
            Line((74.243684089, 23.694692529), (79.938376618, 18))
            Line((79.938376618, 18), (62.301623382, 18))
        make_face(mode=Mode.SUBTRACT)
    # profile 2 of 2: a face of its own
    with BuildSketch(Plane(origin=(0, 15, 0), x_dir=(1, 0, 0), z_dir=(0, 1, 0))):
        with BuildLine():
            Line((74.443401872, -26.323401872), (85.766803743, -15))
            Line((85.766803743, -15), (56.473196257, -15))
            Line((56.473196257, -15), (67.796598128, -26.323401872))
            ThreePointArc((67.796598128, -26.323401872), (71.12, -27.7), (74.443401872, -26.323401872))
        make_face()
        with Locations(Location((71.12, -23, 0), (0, 0, 90))):
            Circle(SKETCH5_R, mode=Mode.SUBTRACT)
        with BuildLine():
            Line((79.938376618, -18), (74.243684089, -23.694692529))
            ThreePointArc((74.243684089, -23.694692529), (71.12, -19.8), (67.996315911, -23.694692529))
            Line((67.996315911, -23.694692529), (62.301623382, -18))
            Line((62.301623382, -18), (79.938376618, -18))
        make_face(mode=Mode.SUBTRACT)
    extrude(amount=-BOSS_EXTRUDE5_DEPTH)

    # Fillet2
    # the kernel refuses this fillet: 2 mm, written as the material it adds along each edge
    with BuildSketch(Plane(origin=(79.938376618, 15, -18), x_dir=(-0.7071067811865454, 0, -0.7071067811865498), z_dir=(0, -1, 0)), Plane(origin=(79.938376618, 15, 18), x_dir=(-1, 0, 0), z_dir=(0, -1, 0))) as fillet2_piece_1:
        with BuildLine():
            CenterArc((FILLET2_R * 2.41421356237, -FILLET2_R), FILLET2_R, 90, 135)
            Line((FILLET2_R * 1.70710678119, -FILLET2_R * 1.70710678119), (0, 0))
            Line((0, 0), (FILLET2_R * 2.41421356237, 0))
        make_face()
    extrude(amount=10)
    with BuildSketch(Plane(origin=(62.301623382, 15, -18), x_dir=(0.7071067811865449, 0, -0.70710678118655), z_dir=(0, -1, 0)), Plane(origin=(62.301623382, 15, 18), x_dir=(1, 0, 0), z_dir=(0, -1, 0))) as fillet2_piece_2:
        with BuildLine():
            CenterArc((FILLET2_R * 2.41421356237, FILLET2_R), FILLET2_R, 135, 135)
            Line((FILLET2_R * 1.70710678119, FILLET2_R * 1.70710678119), (0, 0))
            Line((0, 0), (FILLET2_R * 2.41421356237, 0))
        make_face()
    extrude(amount=10)
    with BuildSketch(Plane(origin=(67.996315911, 15, -23.694692529), x_dir=(-0.7071067811865465, 0, 0.7071067811865486), z_dir=(0, -1, 0)), Plane(origin=(74.243684089, 15, 23.694692529), x_dir=(0.7071067811865418, 0, -0.7071067811865531), z_dir=(0, -1, 0))) as fillet2_piece_3:
        with BuildLine():
            CenterArc((3.435112807, -2), FILLET2_R, 90, 97.73638004)
            ThreePointArc((1.453316957, -2.269230769), (0.977167787, -0.974178011), (0, 0))
            Line((0, 0), (3.435112807, 0))
        make_face()
    extrude(amount=10)
    with BuildSketch(Plane(origin=(74.243684089, 15, -23.694692529), x_dir=(-0.21409916145634816, 0, 0.9768119312660387), z_dir=(0, -1, 0)), Plane(origin=(67.996315911, 15, 23.694692529), x_dir=(0.21409916145635713, 0, -0.9768119312660368), z_dir=(0, -1, 0))) as fillet2_piece_4:
        with BuildLine():
            CenterArc((3.5368255, -1.81407425), FILLET2_R, 114.900937496, 97.73638004)
            Line((1.852622881, -2.892712993), (0, 0))
            ThreePointArc((0, 0), (1.347362095, -0.2974812), (2.69472419, 0))
        make_face()
    extrude(amount=10)

    # Sketch6 → Boss-Extrude6 (add)
    with BuildSketch(Plane(origin=(0, 15, 0), x_dir=(1, 0, 0), z_dir=(0, 1, 0))):
        with BuildLine():
            Line((-0.617008747, 10), (-30, 10))
            Line((-30, 10), (-30, -10))
            Line((-30, -10), (-0.617008747, -10))
            Line((-0.617008747, -10), (0, -2.65))
            ThreePointArc((0, -2.65), (-2.65, 0), (0, 2.65))
            Line((0, 2.65), (-0.617008747, 10))
        make_face()
    extrude(amount=-BOSS_EXTRUDE6_DEPTH)

    # Sketch10 → Boss-Extrude7 (add)
    with BuildSketch(Plane.XY.offset(10)):
        with BuildLine():
            Line((-30, 15), (-30, 0))
            ThreePointArc((-30, 0), (-37.5, 7.5), (-30, 15))
        make_face()
    extrude(amount=-BOSS_EXTRUDE7_DEPTH)

    # Sketch7 → Cut-Extrude2 (cut)
    with BuildSketch(Plane.XY.offset(10)):
        Polygon((-7.409106314, 1.94375), (-4.201203881, 7.5), (-7.409106314, 13.05625), (-13.82491118, 13.05625), (-17.032813614, 7.5), (-13.82491118, 1.94375), align=None)
    cut_extrude2 = extrude(amount=-CUT_EXTRUDE2_DEPTH, mode=Mode.SUBTRACT)

    # Sketch8 → Cut-Extrude3 (cut, through all)
    with BuildSketch(Plane.XY.offset(10)):
        with Locations((-10.617008747, 7.5)):
            Circle(SKETCH8_R)
        with Locations((-30, 7.5)):
            Circle(SKETCH8_R)
    extrude(amount=-CUT_EXTRUDE3_DEPTH, mode=Mode.SUBTRACT)

    # Mirror2: Cut-Extrude2 across plane
    add(cut_extrude2.mirror(Plane.XY), mode=Mode.SUBTRACT)

    # Sketch11 → Boss-Extrude8 (add, through all)
    with BuildSketch(Plane(origin=(0, 15, 0), x_dir=(1, 0, 0), z_dir=(0, 1, 0))):
        with BuildLine():
            Line((142.857008747, 10), (152.24, 10))
            Line((152.24, 10), (152.24, -10))
            Line((152.24, -10), (142.857008747, -10))
            Line((142.857008747, -10), (142.24, -2.65))
            ThreePointArc((142.24, -2.65), (144.89, 0), (142.24, 2.65))
            Line((142.24, 2.65), (142.857008747, 10))
        make_face()
    extrude(amount=-BOSS_EXTRUDE8_DEPTH)

    # Sketch12 → Boss-Extrude9 (add)
    with BuildSketch(Plane.XY.offset(10)):
        with BuildLine():
            Line((152.24, 15), (152.24, 0))
            ThreePointArc((152.24, 0), (159.74, 7.5), (152.24, 15))
        make_face()
    extrude(amount=-BOSS_EXTRUDE9_DEPTH)

    # Sketch13 → Cut-Extrude4 (cut, through all)
    with BuildSketch(Plane.XY.offset(10)):
        with Locations((152.24, 7.5)):
            Circle(SKETCH13_R)
    extrude(amount=-CUT_EXTRUDE4_DEPTH, mode=Mode.SUBTRACT)


solid = lpattern2_11_1.part
